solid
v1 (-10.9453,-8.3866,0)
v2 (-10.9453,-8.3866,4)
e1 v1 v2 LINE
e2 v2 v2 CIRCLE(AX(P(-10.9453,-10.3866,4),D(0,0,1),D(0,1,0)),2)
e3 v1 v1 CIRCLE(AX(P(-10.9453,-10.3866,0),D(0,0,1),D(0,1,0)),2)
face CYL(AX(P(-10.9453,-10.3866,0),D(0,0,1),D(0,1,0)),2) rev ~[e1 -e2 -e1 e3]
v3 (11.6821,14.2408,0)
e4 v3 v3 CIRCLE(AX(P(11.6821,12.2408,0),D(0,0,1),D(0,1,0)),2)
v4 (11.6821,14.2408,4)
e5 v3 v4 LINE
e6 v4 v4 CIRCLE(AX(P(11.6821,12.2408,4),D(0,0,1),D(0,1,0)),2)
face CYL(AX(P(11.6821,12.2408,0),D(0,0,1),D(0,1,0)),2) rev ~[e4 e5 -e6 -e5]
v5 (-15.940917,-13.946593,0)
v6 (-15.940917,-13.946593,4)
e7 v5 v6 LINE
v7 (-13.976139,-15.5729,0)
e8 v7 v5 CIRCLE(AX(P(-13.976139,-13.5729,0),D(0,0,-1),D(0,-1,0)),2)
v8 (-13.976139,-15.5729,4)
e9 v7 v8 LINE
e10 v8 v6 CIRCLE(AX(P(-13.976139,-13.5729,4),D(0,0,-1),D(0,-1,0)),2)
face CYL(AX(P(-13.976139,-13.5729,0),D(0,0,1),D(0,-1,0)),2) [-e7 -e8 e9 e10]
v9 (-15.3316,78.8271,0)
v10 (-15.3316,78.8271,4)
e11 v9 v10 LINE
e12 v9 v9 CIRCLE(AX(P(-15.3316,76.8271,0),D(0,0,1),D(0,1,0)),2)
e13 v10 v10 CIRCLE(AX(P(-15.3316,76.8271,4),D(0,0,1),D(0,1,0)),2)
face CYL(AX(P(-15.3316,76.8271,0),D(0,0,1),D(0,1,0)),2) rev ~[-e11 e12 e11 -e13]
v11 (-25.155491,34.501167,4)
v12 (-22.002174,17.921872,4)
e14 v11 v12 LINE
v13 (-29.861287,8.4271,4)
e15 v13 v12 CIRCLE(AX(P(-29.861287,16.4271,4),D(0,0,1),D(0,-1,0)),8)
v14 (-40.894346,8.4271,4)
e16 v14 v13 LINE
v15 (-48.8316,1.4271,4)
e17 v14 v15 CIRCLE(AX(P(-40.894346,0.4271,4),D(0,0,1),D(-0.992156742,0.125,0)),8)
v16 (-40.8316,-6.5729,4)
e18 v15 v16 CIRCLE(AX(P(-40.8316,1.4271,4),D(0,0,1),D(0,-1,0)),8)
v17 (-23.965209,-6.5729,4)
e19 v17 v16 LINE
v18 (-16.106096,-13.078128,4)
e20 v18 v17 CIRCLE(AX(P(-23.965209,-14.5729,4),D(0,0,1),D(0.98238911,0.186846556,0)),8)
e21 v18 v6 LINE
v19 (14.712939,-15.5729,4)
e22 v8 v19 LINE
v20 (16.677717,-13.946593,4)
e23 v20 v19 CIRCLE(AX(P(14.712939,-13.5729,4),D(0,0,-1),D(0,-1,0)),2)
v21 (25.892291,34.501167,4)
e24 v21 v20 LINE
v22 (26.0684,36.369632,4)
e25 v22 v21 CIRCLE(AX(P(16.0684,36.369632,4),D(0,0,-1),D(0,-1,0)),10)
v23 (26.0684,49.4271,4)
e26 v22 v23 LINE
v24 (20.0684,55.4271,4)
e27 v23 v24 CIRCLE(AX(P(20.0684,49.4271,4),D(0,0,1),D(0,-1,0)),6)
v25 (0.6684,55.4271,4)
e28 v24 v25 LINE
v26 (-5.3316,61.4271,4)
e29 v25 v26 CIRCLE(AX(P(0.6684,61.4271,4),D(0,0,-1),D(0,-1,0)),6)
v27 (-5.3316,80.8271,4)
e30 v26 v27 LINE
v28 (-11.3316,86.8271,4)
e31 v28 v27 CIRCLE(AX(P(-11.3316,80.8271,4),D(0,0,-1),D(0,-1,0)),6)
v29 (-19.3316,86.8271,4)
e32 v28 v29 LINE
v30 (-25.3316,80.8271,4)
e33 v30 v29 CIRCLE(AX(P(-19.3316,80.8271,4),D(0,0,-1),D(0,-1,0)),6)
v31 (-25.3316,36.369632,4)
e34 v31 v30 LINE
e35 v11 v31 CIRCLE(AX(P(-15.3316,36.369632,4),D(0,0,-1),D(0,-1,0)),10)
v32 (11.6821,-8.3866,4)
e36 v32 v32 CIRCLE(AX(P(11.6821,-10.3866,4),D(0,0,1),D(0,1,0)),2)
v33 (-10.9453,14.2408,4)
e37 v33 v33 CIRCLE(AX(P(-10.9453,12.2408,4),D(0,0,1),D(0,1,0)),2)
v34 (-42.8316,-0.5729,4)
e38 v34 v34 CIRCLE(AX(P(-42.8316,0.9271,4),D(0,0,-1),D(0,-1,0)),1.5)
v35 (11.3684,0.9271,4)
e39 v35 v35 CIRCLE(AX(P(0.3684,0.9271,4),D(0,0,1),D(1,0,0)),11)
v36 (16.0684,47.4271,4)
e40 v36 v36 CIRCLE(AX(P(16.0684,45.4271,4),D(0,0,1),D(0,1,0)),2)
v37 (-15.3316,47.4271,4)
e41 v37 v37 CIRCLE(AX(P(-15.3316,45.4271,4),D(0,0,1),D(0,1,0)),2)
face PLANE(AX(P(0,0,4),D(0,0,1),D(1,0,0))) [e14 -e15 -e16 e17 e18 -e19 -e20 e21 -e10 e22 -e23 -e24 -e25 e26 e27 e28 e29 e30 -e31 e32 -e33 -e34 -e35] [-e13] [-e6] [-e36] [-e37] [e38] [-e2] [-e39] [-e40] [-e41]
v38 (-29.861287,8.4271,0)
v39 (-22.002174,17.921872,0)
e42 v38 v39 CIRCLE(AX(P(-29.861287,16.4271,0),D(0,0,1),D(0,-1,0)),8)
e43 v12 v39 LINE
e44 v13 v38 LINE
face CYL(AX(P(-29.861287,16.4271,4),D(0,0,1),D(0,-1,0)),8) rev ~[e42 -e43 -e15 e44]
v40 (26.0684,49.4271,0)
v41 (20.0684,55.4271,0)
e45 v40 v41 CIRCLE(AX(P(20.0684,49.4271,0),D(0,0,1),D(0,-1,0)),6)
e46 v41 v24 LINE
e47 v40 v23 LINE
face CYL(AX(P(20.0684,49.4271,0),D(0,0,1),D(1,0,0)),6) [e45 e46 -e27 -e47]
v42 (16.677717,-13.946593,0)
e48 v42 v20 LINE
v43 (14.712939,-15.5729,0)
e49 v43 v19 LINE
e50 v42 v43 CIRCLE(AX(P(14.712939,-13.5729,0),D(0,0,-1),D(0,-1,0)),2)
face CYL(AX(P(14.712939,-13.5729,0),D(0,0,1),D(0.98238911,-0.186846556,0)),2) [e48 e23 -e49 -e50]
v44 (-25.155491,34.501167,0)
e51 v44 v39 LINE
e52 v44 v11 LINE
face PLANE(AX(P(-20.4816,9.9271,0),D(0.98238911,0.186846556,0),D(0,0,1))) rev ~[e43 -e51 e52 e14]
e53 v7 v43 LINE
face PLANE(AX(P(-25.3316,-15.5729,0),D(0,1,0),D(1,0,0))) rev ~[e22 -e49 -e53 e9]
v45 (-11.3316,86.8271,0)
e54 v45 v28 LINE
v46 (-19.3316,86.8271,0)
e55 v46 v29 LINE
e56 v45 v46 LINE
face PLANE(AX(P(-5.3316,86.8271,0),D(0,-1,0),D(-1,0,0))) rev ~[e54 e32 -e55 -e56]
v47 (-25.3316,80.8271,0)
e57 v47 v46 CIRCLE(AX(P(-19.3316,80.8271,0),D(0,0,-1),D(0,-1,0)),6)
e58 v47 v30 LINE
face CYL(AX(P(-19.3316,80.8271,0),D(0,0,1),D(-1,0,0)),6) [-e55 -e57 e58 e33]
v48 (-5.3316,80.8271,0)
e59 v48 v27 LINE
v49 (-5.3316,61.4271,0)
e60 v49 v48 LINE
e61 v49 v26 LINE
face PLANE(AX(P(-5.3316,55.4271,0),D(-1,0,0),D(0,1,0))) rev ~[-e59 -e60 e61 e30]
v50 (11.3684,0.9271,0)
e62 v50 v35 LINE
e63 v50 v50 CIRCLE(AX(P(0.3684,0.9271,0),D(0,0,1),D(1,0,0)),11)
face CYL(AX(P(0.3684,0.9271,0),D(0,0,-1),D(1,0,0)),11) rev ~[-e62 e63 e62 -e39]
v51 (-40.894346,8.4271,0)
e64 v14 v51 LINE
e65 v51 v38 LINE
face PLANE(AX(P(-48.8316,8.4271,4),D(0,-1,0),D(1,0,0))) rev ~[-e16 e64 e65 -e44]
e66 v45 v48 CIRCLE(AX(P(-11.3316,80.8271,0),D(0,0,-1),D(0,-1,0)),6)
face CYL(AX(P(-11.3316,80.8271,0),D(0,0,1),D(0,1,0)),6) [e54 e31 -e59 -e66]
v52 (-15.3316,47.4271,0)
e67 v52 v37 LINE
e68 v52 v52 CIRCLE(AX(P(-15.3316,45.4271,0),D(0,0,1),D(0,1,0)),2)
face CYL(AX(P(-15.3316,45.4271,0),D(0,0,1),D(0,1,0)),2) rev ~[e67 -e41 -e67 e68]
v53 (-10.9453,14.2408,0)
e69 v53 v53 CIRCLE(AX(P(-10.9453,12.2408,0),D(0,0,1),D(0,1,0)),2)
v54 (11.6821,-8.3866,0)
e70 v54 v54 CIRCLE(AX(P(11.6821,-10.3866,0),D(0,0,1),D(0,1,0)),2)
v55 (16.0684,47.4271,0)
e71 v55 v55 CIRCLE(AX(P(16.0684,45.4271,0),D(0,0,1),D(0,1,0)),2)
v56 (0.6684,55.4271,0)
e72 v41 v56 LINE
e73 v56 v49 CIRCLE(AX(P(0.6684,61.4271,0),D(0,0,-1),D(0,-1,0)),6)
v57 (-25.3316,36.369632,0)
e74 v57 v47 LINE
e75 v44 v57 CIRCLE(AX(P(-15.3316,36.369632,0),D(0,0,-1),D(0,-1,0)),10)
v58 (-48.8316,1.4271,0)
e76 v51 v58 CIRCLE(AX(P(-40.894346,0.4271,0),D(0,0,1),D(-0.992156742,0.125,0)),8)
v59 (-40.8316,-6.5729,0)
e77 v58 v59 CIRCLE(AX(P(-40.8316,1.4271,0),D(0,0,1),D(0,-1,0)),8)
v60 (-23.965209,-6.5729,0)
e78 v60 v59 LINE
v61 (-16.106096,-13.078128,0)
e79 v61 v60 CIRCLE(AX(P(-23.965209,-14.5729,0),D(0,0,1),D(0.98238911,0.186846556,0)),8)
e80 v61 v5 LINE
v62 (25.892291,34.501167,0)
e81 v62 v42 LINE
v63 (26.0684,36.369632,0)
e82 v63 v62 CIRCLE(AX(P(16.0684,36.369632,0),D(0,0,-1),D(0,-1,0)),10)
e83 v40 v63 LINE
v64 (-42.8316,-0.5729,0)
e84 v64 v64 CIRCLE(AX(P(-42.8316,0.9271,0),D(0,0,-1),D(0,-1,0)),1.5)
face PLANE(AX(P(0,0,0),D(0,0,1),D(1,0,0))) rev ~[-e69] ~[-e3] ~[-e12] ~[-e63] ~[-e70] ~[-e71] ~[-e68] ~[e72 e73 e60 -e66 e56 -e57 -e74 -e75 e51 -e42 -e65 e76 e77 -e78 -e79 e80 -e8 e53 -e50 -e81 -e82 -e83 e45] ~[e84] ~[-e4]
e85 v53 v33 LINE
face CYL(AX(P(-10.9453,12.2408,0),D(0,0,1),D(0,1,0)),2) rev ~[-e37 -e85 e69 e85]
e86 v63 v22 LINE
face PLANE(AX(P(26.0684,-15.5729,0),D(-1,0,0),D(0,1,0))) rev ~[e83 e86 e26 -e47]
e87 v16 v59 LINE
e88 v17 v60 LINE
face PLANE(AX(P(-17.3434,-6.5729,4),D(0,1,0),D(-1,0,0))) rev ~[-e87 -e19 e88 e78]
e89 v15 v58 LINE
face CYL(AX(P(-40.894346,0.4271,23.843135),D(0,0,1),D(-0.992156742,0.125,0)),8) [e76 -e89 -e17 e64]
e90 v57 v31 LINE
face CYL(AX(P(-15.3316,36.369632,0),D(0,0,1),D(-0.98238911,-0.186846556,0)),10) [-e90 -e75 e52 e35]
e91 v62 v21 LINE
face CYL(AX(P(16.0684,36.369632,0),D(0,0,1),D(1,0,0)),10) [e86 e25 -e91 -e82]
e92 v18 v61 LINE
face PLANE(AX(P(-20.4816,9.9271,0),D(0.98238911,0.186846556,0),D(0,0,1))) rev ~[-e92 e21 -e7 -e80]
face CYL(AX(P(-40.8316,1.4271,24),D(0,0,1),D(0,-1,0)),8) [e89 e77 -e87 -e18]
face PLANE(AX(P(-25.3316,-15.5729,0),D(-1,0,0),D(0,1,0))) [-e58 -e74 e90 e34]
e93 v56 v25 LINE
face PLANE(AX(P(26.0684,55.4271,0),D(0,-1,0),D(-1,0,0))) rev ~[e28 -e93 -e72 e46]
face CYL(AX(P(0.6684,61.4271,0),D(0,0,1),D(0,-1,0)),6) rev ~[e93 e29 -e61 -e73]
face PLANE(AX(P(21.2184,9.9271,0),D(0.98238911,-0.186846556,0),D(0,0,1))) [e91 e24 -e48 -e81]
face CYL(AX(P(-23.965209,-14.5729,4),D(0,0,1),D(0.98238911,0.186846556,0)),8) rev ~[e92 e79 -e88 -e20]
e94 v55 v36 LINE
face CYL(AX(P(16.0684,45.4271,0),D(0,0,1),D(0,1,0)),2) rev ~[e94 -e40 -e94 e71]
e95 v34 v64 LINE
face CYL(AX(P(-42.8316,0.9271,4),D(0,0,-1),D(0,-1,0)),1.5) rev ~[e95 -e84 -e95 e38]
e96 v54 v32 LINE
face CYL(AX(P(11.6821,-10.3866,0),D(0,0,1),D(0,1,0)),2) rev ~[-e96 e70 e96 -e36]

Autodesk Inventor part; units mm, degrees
ref_plane "YZ Plane" through (0, 0, 0) normal (1, 0, 0) x (0, 1, 0)
ref_plane "XZ Plane" through (0, 0, 0) normal (0, 1, 0) x (-1, 0, 0)
ref_plane "XY Plane" through (0, 0, 0) normal (0, 0, 1) x (1, 0, 0)
sketch "Szkic1" plane through (0, 0, 0) normal (0, 0, 1) x (1, 0, 0)
  line L0 (-25.3316, -15.5729) -> (26.0684, -15.5729)
  line L1 (26.0684, -15.5729) -> (26.0684, 35.4271)
  line L2 (26.0684, 35.4271) -> (26.0684, 35.4271)
  line L3 (26.0684, 35.4271) -> (26.0684, 55.4271)
  line L4 (26.0684, 55.4271) -> (-5.3316, 55.4271)
  line L5 (-5.3316, 55.4271) -> (-5.3316, 86.8271)
  line L6 (-5.3316, 86.8271) -> (-25.3316, 86.8271)
  line L7 (-25.3316, -15.5729) -> (-25.3316, 86.8271)
  line L8 (-15.6316, 16.9271) -> (16.3684, 16.9271)
  line L9 (16.3684, 16.9271) -> (16.3684, -15.0729)
  line L10 (16.3684, -15.0729) -> (-15.6316, -15.0729)
  line L11 (-15.6316, -15.0729) -> (-15.6316, 16.9271)
  circle A0 centre (0.3684, 0.9271) radius 11
  circle A1 centre (0.3684, 0.9271) radius 16
  point P0 (0, 0)
  point P1 (-10.9453, 12.2408)
  point P2 (11.6821, 12.2408)
  point P3 (11.6821, -10.3866)
  point P4 (-10.9453, -10.3866)
  point P5 (16.0684, 45.4271)
  point P6 (-15.3316, 76.8271)
  point P7 (-15.3316, 45.4271)
  dimension "d0" = 20
  dimension "d1" = 20
  dimension "d2" = 51.4
  dimension "d3" = 51.4
  dimension "d4" = 34.5
  dimension "d5" = 25.7
  dimension "d6" = 51.4
  dimension "d7" = 51
  dimension "d8" = 32
  dimension "d9" = 32
  dimension "d10" = 16
  dimension "d11" = 16
  dimension "d12" = 22
  dimension "d13" = 32
  dimension "d23" = 10
  dimension "d24" = 10
  dimension "d25" = 10
  dimension "d26" = 10
  dimension "d27" = 10
  dimension "d28" = 10
extrude "Wyciągnięcie proste1" add sketch "Szkic1" along normal blind 4 contours L7 L6 L5 L4 L3 L1 L0 | L8 A1 L11 | L8 L9 A1 | A1 | A1 L10 L11 | L9 L10 A1
hole "Otwór1" at (0.3684, 0.9271, 0) at (-10.9453, 12.2408, 0) at (11.6821, 12.2408, 0) at (11.6821, -10.3866, 0) at (-10.9453, -10.3866, 0) direction (0, 0, 1) diameter 4 end through all
hole "Otwór2" at (16.0684, 45.4271, 0) at (-15.3316, 76.8271, 0) at (-15.3316, 45.4271, 0) direction (0, 0, 1) diameter 4 end through all
chamfer "Faza1" distance 51 distance2 9.7 1 edges at (-25.3316, -15.5729, 2) measured on face at (-25.3316, 18.5605, 1.3333)
chamfer "Faza2" distance 51 distance2 9.7 1 edges at (26.0684, -15.5729, 2) measured on face at (26.0684, 31.7605, 1.3333)
fillet "Zaokrąglenie2" radius 6 4 edges at (-5.3316, 55.4271, 2) (26.0684, 55.4271, 2) (-5.3316, 86.8271, 2) (-25.3316, 86.8271, 2)
fillet "Zaokrąglenie3" radius 10 2 edges at (-25.3316, 35.4271, 2) (26.0684, 35.4271, 2)
sketch "Szkic2" plane through (0, 0, 4) normal (0, 0, 1) x (1, 0, 0)
  arc A0 (25.8923, 34.5012) -> (26.0684, 36.3697) centre (16.0684, 36.3697) ccw projected
  line L0 (26.0684, 36.3697) -> (26.0684, 49.4271) projected
  arc A1 (26.0684, 49.4271) -> (20.0684, 55.4271) centre (20.0684, 49.4271) ccw projected
  line L1 (20.0684, 55.4271) -> (0.6684, 55.4271) projected
  arc A2 (-5.3316, 61.4271) -> (0.6684, 55.4271) centre (0.6684, 61.4271) ccw projected
  line L2 (-5.3316, 61.4271) -> (-5.3316, 80.8271) projected
  arc A3 (-5.3316, 80.8271) -> (-11.3316, 86.8271) centre (-11.3316, 80.8271) ccw projected
  line L3 (-11.3316, 86.8271) -> (-19.3316, 86.8271) projected
  arc A4 (-19.3316, 86.8271) -> (-25.3316, 80.8271) centre (-19.3316, 80.8271) ccw projected
  line L4 (-25.3316, 80.8271) -> (-25.3316, 36.3697) projected
  arc A5 (-25.3316, 36.3697) -> (-25.1555, 34.5012) centre (-15.3316, 36.3697) ccw projected
  line L5 (-15.6316, -15.5729) -> (-25.1555, 34.5012) projected
  line L6 (-15.6316, -15.5729) -> (16.3684, -15.5729) projected
  line L7 (25.8923, 34.5012) -> (16.3684, -15.5729) projected
  circle A6 centre (-15.3316, 76.8271) radius 2 projected
  circle A7 centre (16.0684, 45.4271) radius 2 projected
  circle A8 centre (-15.3316, 45.4271) radius 2 projected
  circle A9 centre (11.6821, -10.3866) radius 2 projected
  circle A10 centre (-10.9453, 12.2408) radius 2 projected
  circle A11 centre (11.6821, 12.2408) radius 2 projected
  circle A12 centre (-10.9453, -10.3866) radius 2 projected
  circle A13 centre (0.3684, 0.9271) radius 11 projected
  line L8 (-17.3434, -6.5729) -> (-48.8316, -6.5729)
  line L9 (-48.8316, -6.5729) -> (-48.8316, 8.4271)
  line L10 (-48.8316, 8.4271) -> (-20.1963, 8.4271)
  point P0 (0, 0)
  point P1 (-42.8316, 0.9271)
  dimension "d45" = 15
  dimension "d46" = 9
  dimension "d47" = 23.5
  dimension "d50" = 7.5
  dimension "d51" = 6
extrude "Wyciągnięcie proste2" add sketch "Szkic2" against normal blind 4 contours L8 L9 L10 L5
hole "Otwór3" at (-42.8316, 0.9271, 4) direction (0, 0, -1) diameter 3 end through all
fillet "Zaokrąglenie4" radius 8 4 edges at (-17.3434, -6.5729, 2) (-20.1963, 8.4271, 2) (-48.8316, -6.5729, 2) (-48.8316, 8.4271, 2)
fillet "Zaokrąglenie5" radius 2 2 edges at (-15.6316, -15.5729, 2) (16.3684, -15.5729, 2)
equation "\"d1\" = d0"
equation "\"d2\" = d6"
equation "\"d3\" = d6"
equation "\"d6\" = 2 * d5"
equation "\"d10\" = 0.5 * d9"
equation "\"d11\" = 0.5 * d8"
equation "\"d25\" = 0.5 * d1"
equation "\"d26\" = 0.5 * d0"
equation "\"d27\" = d25"
equation "\"d28\" = d26"
equation "\"d50\" = 0.5 * d45"
properties part number "LC_ALU_4mm_Heatbed_Frame_Linear_Bearing_Mounting_Bracket_Z_endstop"
